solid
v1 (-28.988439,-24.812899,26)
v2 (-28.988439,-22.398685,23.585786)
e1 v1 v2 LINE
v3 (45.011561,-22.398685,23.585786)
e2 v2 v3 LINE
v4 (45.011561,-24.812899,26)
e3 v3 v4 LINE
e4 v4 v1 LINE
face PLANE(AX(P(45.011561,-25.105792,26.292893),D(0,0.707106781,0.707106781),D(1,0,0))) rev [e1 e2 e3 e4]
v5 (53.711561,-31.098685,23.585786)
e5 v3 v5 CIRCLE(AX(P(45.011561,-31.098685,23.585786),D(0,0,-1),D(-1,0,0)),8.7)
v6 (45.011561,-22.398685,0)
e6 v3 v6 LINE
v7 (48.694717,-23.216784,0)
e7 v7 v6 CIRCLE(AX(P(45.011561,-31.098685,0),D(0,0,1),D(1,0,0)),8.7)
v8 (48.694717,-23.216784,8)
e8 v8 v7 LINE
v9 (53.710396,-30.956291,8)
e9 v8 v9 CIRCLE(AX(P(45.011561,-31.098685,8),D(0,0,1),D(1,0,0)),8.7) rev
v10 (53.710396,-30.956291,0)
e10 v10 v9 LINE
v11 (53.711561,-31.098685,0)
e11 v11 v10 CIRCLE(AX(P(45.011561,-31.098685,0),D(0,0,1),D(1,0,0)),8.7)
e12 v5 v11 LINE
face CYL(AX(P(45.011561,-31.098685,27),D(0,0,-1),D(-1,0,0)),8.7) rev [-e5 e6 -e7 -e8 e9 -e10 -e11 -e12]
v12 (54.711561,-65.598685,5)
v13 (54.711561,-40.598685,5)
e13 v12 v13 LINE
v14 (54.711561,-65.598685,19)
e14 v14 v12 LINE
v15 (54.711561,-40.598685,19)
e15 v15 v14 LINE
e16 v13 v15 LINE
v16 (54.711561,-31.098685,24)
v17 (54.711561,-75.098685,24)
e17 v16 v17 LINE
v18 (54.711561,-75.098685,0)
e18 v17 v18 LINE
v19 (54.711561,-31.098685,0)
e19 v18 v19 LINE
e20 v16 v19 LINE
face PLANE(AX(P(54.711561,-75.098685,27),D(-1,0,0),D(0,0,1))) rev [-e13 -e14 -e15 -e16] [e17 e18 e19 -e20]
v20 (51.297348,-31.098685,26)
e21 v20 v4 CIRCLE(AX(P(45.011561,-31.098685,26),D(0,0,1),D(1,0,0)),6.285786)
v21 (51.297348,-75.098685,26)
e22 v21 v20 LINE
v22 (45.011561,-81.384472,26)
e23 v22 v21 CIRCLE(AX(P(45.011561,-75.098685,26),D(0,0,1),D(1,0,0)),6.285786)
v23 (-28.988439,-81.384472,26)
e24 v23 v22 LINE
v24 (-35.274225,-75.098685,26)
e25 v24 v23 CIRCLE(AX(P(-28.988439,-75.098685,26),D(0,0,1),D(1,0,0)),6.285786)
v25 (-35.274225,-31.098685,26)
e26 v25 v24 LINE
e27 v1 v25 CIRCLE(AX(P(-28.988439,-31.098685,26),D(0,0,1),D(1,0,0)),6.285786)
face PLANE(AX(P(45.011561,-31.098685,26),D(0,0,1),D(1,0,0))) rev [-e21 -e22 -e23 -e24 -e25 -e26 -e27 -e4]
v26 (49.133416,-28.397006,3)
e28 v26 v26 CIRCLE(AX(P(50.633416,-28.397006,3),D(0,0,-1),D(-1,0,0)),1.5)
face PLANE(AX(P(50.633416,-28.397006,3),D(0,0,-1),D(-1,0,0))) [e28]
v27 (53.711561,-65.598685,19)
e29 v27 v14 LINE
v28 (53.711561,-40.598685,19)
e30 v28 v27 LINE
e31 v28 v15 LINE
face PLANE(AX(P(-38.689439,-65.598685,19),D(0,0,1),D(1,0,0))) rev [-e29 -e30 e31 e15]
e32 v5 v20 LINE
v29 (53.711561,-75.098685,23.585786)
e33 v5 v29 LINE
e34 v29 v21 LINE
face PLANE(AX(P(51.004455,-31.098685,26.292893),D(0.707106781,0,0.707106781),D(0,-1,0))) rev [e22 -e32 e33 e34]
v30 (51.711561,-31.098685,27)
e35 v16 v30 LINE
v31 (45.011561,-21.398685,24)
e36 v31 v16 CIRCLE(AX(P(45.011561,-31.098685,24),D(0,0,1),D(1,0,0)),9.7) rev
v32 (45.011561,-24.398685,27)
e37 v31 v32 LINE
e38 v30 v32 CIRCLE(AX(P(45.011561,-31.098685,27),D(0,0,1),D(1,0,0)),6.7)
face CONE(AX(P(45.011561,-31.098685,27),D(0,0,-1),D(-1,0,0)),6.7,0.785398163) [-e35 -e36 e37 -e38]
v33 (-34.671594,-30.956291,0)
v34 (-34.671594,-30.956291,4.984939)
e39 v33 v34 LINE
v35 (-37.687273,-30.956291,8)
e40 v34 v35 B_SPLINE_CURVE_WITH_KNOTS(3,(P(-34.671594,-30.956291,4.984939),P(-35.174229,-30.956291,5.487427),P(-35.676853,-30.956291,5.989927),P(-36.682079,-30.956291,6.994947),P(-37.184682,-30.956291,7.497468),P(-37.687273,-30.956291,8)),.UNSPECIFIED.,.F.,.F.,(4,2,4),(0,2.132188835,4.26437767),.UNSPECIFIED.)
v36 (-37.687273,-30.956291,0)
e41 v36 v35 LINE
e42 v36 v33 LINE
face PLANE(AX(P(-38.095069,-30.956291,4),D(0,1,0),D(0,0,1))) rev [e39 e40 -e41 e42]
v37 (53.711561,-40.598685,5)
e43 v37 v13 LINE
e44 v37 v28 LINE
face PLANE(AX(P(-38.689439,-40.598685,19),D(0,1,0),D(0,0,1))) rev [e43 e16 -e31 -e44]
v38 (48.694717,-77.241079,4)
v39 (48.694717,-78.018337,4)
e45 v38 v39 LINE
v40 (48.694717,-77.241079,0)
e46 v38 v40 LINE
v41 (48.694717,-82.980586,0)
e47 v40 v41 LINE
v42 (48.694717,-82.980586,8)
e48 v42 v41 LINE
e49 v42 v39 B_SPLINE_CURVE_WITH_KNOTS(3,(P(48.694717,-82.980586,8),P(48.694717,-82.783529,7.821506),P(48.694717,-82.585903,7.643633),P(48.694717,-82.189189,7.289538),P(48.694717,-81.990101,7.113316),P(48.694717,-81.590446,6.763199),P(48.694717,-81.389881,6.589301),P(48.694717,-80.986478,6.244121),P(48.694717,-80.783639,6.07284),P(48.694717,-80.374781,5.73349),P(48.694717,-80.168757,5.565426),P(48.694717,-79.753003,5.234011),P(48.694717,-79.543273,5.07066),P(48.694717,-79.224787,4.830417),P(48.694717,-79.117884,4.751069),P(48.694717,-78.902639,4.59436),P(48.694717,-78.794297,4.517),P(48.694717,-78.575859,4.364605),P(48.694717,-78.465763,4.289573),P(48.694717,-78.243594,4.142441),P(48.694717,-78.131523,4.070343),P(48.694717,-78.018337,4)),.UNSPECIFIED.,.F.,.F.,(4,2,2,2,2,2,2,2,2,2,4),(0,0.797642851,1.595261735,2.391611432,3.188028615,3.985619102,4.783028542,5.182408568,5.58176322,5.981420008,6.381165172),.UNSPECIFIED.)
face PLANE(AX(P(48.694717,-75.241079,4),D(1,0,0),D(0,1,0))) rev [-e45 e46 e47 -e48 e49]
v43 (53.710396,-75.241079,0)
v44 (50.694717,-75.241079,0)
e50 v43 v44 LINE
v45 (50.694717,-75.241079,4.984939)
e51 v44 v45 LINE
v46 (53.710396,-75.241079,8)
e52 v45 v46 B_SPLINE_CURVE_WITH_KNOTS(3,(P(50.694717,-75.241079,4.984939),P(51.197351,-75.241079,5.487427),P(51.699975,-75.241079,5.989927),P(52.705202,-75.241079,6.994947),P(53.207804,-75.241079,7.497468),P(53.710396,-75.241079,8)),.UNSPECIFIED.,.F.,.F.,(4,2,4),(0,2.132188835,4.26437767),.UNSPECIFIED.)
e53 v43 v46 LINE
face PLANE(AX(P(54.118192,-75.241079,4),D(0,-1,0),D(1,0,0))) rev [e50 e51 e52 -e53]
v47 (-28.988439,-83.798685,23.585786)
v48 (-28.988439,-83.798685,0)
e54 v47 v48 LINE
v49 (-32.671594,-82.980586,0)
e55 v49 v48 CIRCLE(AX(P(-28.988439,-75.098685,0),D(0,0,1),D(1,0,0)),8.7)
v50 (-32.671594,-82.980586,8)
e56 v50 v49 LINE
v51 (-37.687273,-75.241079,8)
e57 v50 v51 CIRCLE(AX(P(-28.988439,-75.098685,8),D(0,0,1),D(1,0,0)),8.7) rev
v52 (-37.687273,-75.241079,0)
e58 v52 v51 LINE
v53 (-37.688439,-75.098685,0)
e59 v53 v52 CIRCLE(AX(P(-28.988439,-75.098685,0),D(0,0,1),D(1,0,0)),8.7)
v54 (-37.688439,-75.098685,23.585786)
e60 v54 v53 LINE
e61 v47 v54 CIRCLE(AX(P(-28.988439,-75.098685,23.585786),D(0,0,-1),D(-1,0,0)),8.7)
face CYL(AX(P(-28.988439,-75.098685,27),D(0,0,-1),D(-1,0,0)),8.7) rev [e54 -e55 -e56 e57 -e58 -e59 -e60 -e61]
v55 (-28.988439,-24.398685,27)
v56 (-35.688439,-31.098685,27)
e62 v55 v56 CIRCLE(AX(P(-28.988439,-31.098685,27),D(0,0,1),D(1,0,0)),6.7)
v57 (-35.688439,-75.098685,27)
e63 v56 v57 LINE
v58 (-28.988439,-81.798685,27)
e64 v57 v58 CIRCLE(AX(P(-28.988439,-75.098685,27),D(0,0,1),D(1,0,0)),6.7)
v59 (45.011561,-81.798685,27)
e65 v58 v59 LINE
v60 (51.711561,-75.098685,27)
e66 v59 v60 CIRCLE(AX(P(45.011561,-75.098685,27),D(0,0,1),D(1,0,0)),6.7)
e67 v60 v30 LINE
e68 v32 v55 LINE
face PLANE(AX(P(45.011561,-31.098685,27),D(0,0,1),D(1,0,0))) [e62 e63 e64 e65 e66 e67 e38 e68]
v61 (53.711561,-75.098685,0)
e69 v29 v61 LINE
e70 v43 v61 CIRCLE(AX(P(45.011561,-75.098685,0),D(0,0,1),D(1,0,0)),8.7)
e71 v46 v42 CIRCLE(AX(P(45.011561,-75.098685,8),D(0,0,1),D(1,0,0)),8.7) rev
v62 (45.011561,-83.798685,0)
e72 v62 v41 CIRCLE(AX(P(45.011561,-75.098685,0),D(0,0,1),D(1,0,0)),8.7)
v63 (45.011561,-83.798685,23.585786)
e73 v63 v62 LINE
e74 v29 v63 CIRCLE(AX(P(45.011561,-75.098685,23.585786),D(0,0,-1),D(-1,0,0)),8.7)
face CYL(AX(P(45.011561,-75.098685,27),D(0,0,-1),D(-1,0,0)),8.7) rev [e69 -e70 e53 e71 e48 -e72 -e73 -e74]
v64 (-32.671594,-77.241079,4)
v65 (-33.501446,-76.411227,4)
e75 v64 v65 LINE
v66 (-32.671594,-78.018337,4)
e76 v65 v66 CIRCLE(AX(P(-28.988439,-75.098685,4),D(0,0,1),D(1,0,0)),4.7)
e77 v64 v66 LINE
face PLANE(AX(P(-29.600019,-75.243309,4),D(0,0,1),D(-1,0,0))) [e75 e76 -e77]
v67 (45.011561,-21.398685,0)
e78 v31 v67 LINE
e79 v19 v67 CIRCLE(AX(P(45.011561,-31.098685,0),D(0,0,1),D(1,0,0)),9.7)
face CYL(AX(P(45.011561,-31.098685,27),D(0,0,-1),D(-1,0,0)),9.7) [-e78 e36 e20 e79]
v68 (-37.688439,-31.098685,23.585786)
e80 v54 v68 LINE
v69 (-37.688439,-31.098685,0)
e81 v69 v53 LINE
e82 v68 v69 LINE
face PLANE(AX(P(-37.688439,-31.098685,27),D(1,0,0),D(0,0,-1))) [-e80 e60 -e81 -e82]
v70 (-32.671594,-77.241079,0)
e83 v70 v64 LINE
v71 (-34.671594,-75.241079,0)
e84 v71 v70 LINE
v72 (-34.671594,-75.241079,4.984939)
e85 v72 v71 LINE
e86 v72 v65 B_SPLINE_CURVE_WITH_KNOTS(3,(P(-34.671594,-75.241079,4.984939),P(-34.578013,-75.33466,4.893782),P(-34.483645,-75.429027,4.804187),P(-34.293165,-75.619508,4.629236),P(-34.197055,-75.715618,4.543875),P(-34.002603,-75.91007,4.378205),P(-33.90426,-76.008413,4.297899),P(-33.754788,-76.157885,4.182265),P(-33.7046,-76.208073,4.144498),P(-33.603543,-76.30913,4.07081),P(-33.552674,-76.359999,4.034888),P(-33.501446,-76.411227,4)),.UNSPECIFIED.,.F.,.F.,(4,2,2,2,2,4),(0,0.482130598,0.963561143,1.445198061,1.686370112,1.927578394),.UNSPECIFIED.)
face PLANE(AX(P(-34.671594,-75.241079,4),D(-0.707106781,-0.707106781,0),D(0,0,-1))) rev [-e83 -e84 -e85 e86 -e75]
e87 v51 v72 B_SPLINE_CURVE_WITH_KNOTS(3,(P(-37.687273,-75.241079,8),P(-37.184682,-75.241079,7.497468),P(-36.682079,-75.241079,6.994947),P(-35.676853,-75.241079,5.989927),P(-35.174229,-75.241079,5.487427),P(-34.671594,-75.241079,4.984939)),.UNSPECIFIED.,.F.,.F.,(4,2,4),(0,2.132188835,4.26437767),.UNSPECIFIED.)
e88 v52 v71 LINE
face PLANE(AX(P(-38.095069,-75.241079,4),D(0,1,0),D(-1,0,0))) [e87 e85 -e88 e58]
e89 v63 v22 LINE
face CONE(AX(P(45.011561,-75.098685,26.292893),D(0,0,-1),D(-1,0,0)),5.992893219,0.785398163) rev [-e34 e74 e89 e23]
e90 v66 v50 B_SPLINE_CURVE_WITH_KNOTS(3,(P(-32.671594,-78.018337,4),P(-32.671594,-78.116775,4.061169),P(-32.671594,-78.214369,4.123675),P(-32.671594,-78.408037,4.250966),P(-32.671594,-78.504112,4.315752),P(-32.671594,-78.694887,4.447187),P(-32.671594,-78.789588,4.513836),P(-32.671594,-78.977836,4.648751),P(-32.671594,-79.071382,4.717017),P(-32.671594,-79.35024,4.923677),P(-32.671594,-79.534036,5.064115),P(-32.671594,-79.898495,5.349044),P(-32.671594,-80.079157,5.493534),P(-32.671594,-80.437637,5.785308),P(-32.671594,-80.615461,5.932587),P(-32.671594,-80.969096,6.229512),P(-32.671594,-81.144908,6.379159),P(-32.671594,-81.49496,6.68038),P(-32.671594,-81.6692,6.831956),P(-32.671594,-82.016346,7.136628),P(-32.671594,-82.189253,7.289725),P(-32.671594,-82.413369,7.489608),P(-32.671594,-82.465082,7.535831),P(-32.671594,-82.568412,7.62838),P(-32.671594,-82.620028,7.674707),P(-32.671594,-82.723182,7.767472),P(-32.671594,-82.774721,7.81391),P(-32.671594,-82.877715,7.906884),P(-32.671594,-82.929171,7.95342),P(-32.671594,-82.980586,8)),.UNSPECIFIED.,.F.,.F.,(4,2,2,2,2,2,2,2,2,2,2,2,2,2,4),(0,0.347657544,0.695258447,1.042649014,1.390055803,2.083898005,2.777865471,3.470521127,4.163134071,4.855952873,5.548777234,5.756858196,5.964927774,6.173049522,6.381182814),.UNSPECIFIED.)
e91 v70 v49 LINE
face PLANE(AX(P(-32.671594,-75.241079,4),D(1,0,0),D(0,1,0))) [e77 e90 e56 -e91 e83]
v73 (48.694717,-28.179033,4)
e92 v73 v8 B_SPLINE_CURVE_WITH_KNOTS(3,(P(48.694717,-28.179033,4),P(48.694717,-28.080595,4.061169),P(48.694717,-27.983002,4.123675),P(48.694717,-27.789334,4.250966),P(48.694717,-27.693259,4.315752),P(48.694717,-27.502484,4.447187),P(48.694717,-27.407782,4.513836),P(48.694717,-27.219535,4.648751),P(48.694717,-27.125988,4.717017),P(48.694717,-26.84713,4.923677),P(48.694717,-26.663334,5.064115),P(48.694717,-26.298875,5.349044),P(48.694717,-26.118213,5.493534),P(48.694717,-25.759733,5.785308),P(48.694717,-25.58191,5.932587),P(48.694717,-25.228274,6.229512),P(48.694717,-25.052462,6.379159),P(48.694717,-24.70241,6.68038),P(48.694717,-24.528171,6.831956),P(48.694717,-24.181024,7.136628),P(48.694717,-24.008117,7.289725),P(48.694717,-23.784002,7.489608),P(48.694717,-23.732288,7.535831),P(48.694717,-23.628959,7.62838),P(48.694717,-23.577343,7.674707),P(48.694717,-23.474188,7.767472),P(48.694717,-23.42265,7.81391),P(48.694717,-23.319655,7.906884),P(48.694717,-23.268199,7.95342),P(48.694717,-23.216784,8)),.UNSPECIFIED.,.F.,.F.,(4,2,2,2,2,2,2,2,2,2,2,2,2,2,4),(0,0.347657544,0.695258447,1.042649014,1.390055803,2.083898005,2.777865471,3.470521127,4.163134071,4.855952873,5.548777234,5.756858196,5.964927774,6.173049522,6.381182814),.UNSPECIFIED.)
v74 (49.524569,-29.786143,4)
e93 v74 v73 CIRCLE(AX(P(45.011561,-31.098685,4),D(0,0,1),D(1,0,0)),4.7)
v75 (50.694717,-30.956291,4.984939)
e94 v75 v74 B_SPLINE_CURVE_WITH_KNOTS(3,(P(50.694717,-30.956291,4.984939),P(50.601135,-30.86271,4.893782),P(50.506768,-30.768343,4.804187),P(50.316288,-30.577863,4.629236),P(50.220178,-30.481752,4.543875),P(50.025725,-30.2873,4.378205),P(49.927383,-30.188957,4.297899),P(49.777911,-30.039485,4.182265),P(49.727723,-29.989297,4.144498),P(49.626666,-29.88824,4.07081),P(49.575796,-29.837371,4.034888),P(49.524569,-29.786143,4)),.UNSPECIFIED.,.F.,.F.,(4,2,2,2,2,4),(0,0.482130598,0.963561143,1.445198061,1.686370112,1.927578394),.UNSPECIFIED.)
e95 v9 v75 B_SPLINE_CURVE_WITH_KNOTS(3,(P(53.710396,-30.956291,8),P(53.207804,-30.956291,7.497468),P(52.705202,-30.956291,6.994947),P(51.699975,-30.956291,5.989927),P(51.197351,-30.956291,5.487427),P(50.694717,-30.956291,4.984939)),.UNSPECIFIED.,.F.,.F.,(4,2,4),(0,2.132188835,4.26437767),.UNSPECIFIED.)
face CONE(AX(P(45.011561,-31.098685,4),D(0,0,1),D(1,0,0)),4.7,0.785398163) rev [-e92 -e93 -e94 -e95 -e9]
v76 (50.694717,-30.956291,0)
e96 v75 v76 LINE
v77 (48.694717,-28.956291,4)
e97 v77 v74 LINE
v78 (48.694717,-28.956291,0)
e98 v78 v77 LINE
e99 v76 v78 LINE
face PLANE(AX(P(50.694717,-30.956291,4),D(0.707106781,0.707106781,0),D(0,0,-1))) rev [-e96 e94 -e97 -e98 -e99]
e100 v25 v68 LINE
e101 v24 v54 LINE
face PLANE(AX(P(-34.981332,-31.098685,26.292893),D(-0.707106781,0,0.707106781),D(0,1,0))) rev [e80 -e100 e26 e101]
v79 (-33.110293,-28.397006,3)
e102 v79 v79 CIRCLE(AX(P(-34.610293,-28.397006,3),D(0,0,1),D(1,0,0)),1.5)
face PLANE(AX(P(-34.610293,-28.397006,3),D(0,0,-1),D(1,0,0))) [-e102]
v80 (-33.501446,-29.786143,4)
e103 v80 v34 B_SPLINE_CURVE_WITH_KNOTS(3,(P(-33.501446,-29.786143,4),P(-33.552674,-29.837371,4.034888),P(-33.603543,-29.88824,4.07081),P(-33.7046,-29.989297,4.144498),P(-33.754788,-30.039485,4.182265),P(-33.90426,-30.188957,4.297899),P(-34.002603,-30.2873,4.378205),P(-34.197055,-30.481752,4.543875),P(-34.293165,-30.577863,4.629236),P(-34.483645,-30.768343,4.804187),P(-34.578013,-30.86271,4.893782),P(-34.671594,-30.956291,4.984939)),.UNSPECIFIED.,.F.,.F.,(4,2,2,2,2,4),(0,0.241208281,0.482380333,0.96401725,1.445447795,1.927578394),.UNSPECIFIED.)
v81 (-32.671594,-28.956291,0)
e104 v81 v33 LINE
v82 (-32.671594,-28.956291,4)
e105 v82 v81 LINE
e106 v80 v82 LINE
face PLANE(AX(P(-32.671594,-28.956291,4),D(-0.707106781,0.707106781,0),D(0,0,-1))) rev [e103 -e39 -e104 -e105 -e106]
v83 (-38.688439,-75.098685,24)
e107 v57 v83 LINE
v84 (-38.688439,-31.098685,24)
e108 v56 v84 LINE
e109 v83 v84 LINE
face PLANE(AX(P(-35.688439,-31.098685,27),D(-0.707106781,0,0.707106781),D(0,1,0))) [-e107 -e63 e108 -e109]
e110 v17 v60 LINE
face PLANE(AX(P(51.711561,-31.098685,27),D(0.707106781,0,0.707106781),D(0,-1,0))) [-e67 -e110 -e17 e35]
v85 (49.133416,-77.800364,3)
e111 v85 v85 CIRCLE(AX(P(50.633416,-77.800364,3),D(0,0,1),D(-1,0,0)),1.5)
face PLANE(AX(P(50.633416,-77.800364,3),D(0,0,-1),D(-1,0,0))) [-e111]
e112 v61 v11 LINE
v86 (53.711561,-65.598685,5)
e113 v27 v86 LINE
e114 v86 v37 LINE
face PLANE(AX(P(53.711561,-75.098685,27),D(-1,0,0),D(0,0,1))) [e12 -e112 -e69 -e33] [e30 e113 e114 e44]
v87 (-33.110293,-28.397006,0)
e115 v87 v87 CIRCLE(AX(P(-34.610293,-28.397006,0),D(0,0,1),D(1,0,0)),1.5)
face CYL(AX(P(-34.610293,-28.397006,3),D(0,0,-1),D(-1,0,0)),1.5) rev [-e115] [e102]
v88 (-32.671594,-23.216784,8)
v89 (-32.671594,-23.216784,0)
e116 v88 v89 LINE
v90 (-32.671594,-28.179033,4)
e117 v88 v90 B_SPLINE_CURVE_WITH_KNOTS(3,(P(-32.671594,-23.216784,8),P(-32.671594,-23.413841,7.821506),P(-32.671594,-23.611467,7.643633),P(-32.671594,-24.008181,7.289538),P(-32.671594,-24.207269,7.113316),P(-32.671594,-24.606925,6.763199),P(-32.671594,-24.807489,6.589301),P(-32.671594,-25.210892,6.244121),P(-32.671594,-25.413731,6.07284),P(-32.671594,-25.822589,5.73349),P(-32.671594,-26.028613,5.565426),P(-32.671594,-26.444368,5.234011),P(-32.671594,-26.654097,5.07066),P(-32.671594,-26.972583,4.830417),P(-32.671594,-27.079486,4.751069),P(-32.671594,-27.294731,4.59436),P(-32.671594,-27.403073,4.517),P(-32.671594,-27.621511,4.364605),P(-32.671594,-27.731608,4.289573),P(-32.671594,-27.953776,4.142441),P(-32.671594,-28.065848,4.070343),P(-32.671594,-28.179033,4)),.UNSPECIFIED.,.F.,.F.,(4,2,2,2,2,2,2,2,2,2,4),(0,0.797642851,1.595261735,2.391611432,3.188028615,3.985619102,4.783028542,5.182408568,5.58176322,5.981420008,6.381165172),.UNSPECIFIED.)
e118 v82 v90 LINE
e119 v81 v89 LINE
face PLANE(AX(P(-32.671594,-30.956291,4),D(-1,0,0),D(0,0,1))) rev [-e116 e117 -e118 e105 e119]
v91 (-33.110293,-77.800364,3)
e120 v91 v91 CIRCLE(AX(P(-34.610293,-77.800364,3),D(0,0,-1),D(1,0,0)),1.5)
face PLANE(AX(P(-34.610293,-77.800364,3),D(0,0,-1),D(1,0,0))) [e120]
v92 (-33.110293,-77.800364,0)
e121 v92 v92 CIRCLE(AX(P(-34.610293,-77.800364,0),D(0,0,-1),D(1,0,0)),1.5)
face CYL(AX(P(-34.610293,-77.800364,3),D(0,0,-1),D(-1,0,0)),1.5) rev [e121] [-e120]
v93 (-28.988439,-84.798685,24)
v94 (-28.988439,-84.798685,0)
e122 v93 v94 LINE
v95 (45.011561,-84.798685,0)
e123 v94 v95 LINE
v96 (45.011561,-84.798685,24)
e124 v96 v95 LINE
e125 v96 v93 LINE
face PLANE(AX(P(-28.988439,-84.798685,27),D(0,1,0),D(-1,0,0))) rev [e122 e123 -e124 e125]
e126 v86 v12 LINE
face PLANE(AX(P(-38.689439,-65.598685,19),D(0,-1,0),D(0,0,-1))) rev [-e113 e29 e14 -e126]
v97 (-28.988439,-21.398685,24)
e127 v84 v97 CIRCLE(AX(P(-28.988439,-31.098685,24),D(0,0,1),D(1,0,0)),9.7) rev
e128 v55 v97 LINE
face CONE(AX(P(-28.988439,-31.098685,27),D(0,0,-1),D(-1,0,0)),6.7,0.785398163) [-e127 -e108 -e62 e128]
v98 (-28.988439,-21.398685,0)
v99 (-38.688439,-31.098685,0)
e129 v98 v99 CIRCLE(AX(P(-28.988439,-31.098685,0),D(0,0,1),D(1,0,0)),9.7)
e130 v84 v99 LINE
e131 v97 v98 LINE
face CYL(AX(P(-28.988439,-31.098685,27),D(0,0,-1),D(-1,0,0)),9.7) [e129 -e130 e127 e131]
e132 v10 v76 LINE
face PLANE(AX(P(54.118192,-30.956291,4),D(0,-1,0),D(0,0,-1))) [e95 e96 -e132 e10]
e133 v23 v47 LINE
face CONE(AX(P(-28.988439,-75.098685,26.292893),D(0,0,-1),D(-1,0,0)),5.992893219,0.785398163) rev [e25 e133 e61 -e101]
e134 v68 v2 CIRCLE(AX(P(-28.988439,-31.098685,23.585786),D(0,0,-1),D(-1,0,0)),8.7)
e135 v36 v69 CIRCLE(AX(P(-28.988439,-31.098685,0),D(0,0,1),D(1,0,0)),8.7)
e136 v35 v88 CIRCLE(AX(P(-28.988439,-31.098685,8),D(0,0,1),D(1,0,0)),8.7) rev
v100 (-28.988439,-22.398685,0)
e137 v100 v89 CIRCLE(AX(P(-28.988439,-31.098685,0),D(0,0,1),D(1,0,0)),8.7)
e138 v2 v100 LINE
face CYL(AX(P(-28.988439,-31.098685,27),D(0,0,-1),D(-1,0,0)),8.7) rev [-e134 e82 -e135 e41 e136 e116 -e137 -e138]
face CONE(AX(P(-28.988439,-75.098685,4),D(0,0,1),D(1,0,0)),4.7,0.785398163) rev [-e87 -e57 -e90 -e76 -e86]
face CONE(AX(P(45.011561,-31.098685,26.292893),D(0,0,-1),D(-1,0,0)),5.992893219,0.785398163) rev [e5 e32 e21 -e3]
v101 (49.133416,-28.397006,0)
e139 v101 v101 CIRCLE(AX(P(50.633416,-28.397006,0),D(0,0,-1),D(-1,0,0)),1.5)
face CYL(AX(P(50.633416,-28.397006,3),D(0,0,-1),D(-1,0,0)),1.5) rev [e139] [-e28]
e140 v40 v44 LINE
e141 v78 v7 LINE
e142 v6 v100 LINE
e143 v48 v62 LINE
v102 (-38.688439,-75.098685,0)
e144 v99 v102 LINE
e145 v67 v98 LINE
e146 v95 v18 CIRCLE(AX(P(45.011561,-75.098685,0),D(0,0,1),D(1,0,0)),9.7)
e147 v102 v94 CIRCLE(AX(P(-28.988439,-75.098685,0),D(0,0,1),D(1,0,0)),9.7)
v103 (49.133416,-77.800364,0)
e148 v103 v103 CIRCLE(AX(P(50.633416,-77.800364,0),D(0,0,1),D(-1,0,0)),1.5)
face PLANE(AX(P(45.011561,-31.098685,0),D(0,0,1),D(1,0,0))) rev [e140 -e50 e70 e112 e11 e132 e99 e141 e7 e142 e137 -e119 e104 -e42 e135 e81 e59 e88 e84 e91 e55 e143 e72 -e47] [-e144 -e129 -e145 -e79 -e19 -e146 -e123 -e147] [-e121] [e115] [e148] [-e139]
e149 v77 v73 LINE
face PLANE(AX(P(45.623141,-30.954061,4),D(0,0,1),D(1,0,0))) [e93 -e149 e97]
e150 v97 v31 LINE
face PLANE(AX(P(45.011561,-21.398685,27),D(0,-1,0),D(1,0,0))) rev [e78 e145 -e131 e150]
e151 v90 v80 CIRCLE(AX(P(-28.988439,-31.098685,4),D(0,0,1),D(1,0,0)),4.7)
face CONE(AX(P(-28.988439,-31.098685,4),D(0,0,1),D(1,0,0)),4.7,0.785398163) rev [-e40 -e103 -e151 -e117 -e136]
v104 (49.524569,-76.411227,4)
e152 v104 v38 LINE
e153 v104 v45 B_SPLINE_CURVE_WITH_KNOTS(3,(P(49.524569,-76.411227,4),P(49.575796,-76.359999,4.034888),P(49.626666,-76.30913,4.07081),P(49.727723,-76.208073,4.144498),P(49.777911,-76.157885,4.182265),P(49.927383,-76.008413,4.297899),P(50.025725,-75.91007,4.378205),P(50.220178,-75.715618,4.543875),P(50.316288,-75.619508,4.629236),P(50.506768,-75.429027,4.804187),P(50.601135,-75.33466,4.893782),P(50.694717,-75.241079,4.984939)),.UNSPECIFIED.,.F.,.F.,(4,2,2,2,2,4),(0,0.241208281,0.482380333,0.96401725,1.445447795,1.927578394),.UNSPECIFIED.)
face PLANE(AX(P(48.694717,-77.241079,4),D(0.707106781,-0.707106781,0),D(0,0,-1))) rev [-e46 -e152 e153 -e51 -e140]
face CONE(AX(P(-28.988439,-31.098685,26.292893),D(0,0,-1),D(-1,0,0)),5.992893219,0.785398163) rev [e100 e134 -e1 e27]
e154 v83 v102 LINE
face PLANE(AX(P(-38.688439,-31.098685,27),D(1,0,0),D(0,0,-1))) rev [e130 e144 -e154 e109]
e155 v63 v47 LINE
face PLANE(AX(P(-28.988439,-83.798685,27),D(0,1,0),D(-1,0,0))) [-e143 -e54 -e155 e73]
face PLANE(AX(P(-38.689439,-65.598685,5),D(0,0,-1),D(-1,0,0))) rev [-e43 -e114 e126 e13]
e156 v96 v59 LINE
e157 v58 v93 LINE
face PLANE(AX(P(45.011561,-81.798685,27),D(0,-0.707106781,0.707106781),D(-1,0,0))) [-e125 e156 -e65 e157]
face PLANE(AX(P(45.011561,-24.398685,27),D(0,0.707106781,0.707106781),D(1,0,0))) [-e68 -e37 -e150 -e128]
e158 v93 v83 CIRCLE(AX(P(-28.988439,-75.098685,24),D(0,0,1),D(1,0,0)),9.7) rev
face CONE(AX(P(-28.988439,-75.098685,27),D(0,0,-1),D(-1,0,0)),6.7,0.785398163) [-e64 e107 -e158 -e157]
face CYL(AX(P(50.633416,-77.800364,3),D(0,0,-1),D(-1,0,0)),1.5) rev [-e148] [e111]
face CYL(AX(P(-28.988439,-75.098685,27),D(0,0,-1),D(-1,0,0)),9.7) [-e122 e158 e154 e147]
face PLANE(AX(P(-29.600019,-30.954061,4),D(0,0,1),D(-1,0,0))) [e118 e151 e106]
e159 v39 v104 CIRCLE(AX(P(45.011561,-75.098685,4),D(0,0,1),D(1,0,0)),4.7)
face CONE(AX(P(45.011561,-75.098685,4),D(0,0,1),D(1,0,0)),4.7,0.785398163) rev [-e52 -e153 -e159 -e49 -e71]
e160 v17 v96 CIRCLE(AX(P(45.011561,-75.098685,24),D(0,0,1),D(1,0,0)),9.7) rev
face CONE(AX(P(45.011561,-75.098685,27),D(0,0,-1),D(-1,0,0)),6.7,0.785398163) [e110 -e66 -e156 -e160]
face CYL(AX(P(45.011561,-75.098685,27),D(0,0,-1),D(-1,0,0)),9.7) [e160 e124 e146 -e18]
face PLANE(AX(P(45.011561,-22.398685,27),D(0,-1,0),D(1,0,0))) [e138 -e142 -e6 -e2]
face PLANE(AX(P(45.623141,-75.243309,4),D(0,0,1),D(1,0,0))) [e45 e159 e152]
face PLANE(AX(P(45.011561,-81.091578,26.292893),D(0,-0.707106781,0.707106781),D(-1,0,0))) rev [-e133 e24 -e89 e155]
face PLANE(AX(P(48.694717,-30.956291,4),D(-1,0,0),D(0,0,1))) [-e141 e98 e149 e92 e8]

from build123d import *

# Parameters (mm, degrees)
BOSS_EXTRUDE1_DEPTH     = 27
CHAMFER1_SIZE           = 3
SHELL1_T                = -1
CUT_EXTRUDE1_REACH      = 131.009
SKETCH2_W               = 14
SKETCH2_H               = 25
BOSS_EXTRUDE2_DEPTH     = 4
SKETCH7_R               = 1.5
CUT_EXTRUDE2_DEPTH      = 3
MIRROR2_COPY_1_DEPTH    = 4
MIRROR2_COPY_2_SKETCH_R = 1.5
MIRROR2_COPY_2_DEPTH    = 3
CHAMFER2_SIZE           = 2
CHAMFER3_SIZE           = 4


with BuildPart() as part:
    # Sketch1 → Boss-Extrude1 (new body)
    with BuildSketch(Plane.XY):
        with BuildLine():
            Line((54.711561383, -75.098685124), (54.711561383, -31.098685124))
            ThreePointArc((54.711561383, -31.098685124), (51.87049716, -24.239749346), (45.011561383, -21.398685124))
            Line((45.011561383, -21.398685124), (-28.988438617, -21.398685124))
            ThreePointArc((-28.988438617, -21.398685124), (-35.847374395, -24.239749346), (-38.688438617, -31.098685124))
            Line((-38.688438617, -31.098685124), (-38.688438617, -75.098685124))
            ThreePointArc((-38.688438617, -75.098685124), (-35.847374395, -81.957620901), (-28.988438617, -84.798685124))
            Line((-28.988438617, -84.798685124), (45.011561383, -84.798685124))
            ThreePointArc((45.011561383, -84.798685124), (51.87049716, -81.957620901), (54.711561383, -75.098685124))
        make_face()
    extrude(amount=BOSS_EXTRUDE1_DEPTH)

    # Chamfer1
    chamfer1_edges = [part.edges().sort_by_distance(p)[0] for p in [
        (-35.847374395, -24.239749346, 27),
        (-38.688438617, -53.098685124, 27),
        (-35.847374395, -81.957620901, 27),
        (8.011561383, -84.798685124, 27),
        (51.87049716, -81.957620901, 27),
        (54.711561383, -53.098685124, 27),
        (51.87049716, -24.239749346, 27),
        (8.011561383, -21.398685124, 27),
    ]]
    chamfer(chamfer1_edges, length=CHAMFER1_SIZE)

    # Shell1
    shell1_openings = [part.faces().sort_by_distance(p)[0] for p in [
        (8.011561383, -53.098685124, 0),
    ]]
    offset(amount=SHELL1_T, openings=shell1_openings, kind=Kind.INTERSECTION)

    # Sketch2 → Cut-Extrude1 (cut, up to next)
    with BuildSketch(Plane(origin=(54.711561383, 0, 0), x_dir=(0, 0, -1), z_dir=(1, 0, 0)), mode=Mode.PRIVATE) as cut_extrude1_sk1:
        with Locations((-12, -53.098685124)):
            Rectangle(SKETCH2_W, SKETCH2_H)
    cut_extrude1_tool1 = extrude(cut_extrude1_sk1.sketch, amount=-CUT_EXTRUDE1_REACH, mode=Mode.PRIVATE) & part.part
    add(cut_extrude1_tool1.solids().sort_by_distance((54.711561, -53.098685, 12))[0], mode=Mode.SUBTRACT)

    # Sketch3 → Boss-Extrude2 (add)
    with BuildSketch(Plane(origin=(0, 0, 0), x_dir=(-1, 0, 0), z_dir=(0, 0, -1))):
        with BuildLine():
            Line((-54.118192185, -30.956291213), (-48.694716552, -30.956291213))
            Line((-48.694716552, -30.956291213), (-48.694716552, -23.033750656))
            ThreePointArc((-48.694716552, -23.033750656), (-52.633018075, -26.155361191), (-54.118192185, -30.956291213))
        make_face()
    boss_extrude2 = extrude(amount=-BOSS_EXTRUDE2_DEPTH)

    # Sketch7 → Cut-Extrude2 (cut)
    with BuildSketch(Plane(origin=(0, 0, 0), x_dir=(-1, 0, 0), z_dir=(0, 0, -1))):
        with Locations((-50.633416054, -28.397006104)):
            Circle(SKETCH7_R)
    cut_extrude2 = extrude(amount=-CUT_EXTRUDE2_DEPTH, mode=Mode.SUBTRACT)

    # Mirror1: Boss-Extrude2, Cut-Extrude2 across plane
    add(boss_extrude2.mirror(Plane(origin=(0, -53.098685124, 0), x_dir=(0, 0, 1), z_dir=(0, -1, 0))))
    add(cut_extrude2.mirror(Plane(origin=(0, -53.098685124, 0), x_dir=(0, 0, 1), z_dir=(0, -1, 0))), mode=Mode.SUBTRACT)

    # Mirror2: Boss-Extrude2, Cut-Extrude2 across plane
    add(boss_extrude2.mirror(Plane.ZY.offset(-8.011561383)))
    add(cut_extrude2.mirror(Plane.ZY.offset(-8.011561383)), mode=Mode.SUBTRACT)

    # Mirror2 copy 1 sketch → Mirror2 copy 1 (add)
    with BuildSketch(Plane(origin=(16.023122766, -106.197370247, 0), x_dir=(1, 0, 0), z_dir=(0, 0, -1))):
        with BuildLine():
            Line((-54.118192185, -30.956291213), (-48.694716552, -30.956291213))
            Line((-48.694716552, -30.956291213), (-48.694716552, -23.033750656))
            ThreePointArc((-48.694716552, -23.033750656), (-52.633018075, -26.155361191), (-54.118192185, -30.956291213))
        make_face()
    extrude(amount=-MIRROR2_COPY_1_DEPTH)

    # Mirror2 copy 2 sketch → Mirror2 copy 2 (cut)
    with BuildSketch(Plane(origin=(16.023122766, -106.197370247, 0), x_dir=(1, 0, 0), z_dir=(0, 0, -1))):
        with Locations((-50.633416054, -28.397006104)):
            Circle(MIRROR2_COPY_2_SKETCH_R)
    extrude(amount=-MIRROR2_COPY_2_DEPTH, mode=Mode.SUBTRACT)

    # Chamfer2
    chamfer2_edges = [part.edges().sort_by_distance(p)[0] for p in [
        (48.694716552, -30.956291213, 2),
        (48.694716552, -75.241079034, 2),
        (-32.671593786, -75.241079034, 2),
        (-32.671593786, -30.956291213, 2),
    ]]
    chamfer(chamfer2_edges, length=CHAMFER2_SIZE)

    # Chamfer3
    # the kernel refuses this chamfer: 4 mm, written as the material it adds along each edge
    with BuildSketch(Plane(origin=(-28.988438617, -31.098685124, 4), x_dir=(-0.39359677864958253, -0.9192831858772744, 0), z_dir=(0.9192831858772744, -0.39359677864958253, 0))) as chamfer3_piece_1_section:
        Polygon((8.7, -CHAMFER3_SIZE), (8.7 - CHAMFER3_SIZE, 0), (8.7, 0), align=None)
    chamfer3_piece_1 = revolve(axis=Axis((-28.988438617, -31.098685124, 4), (0, 0, -1)), revolution_arc=199.53449135, mode=Mode.PRIVATE)
    chamfer3_piece_1 = split(chamfer3_piece_1, bisect_by=Plane(origin=(-32.671593786, -27.350508509, 5.442527719), z_dir=(-1, 0, 0)), keep=Keep.TOP, mode=Mode.PRIVATE)
    chamfer3_piece_1 = split(chamfer3_piece_1, bisect_by=Plane(origin=(-35.212045354, -30.956291213, 5.442527719), z_dir=(0, 1, 0)), keep=Keep.TOP, mode=Mode.PRIVATE)
    chamfer3_piece_1 = split(chamfer3_piece_1, bisect_by=Plane(origin=(-33.138928218, -29.423625644, 5.442527719), z_dir=(-0.7071067811865476, 0.7071067811865476, 0)), keep=Keep.TOP, mode=Mode.PRIVATE)
    add(chamfer3_piece_1)
    with BuildSketch(Plane(origin=(-28.988438617, -75.098685124, 4), x_dir=(0.6783261272249539, -0.7347609578114475, 0), z_dir=(0.7347609578114475, 0.6783261272249539, 0))) as chamfer3_piece_2_section:
        Polygon((8.7, -CHAMFER3_SIZE), (8.7 - CHAMFER3_SIZE, 0), (8.7, 0), align=None)
    chamfer3_piece_2 = revolve(axis=Axis((-28.988438617, -75.098685124, 4), (0, 0, -1)), revolution_arc=199.53449135, mode=Mode.PRIVATE)
    chamfer3_piece_2 = split(chamfer3_piece_2, bisect_by=Plane(origin=(-35.212045354, -75.241079034, 5.44252772), z_dir=(0, -1, 0)), keep=Keep.TOP, mode=Mode.PRIVATE)
    chamfer3_piece_2 = split(chamfer3_piece_2, bisect_by=Plane(origin=(-32.671593786, -78.846861739, 5.44252772), z_dir=(-1, 0, 0)), keep=Keep.TOP, mode=Mode.PRIVATE)
    chamfer3_piece_2 = split(chamfer3_piece_2, bisect_by=Plane(origin=(-33.138928218, -76.773744603, 5.44252772), z_dir=(-0.7071067811865476, -0.7071067811865476, 0)), keep=Keep.TOP, mode=Mode.PRIVATE)
    add(chamfer3_piece_2)
    with BuildSketch(Plane(origin=(45.011561383, -75.098685124, 4), x_dir=(0.39359677864958265, 0.9192831858772744, 0), z_dir=(-0.9192831858772744, 0.39359677864958265, 0))) as chamfer3_piece_3_section:
        Polygon((8.7, -CHAMFER3_SIZE), (8.7 - CHAMFER3_SIZE, 0), (8.7, 0), align=None)
    chamfer3_piece_3 = revolve(axis=Axis((45.011561383, -75.098685124, 4), (0, 0, -1)), revolution_arc=199.53449135, mode=Mode.PRIVATE)
    chamfer3_piece_3 = split(chamfer3_piece_3, bisect_by=Plane(origin=(48.694716552, -78.846861739, 5.44252772), z_dir=(1, 0, 0)), keep=Keep.TOP, mode=Mode.PRIVATE)
    chamfer3_piece_3 = split(chamfer3_piece_3, bisect_by=Plane(origin=(51.23516812, -75.241079034, 5.44252772), z_dir=(0, -1, 0)), keep=Keep.TOP, mode=Mode.PRIVATE)
    chamfer3_piece_3 = split(chamfer3_piece_3, bisect_by=Plane(origin=(49.162050984, -76.773744603, 5.44252772), z_dir=(0.7071067811865476, -0.7071067811865476, 0)), keep=Keep.TOP, mode=Mode.PRIVATE)
    add(chamfer3_piece_3)
    with BuildSketch(Plane(origin=(45.011561383, -31.098685124, 4), x_dir=(-0.6783261272249526, 0.7347609578114488, 0), z_dir=(-0.7347609578114488, -0.6783261272249526, 0))) as chamfer3_piece_4_section:
        Polygon((8.7, -CHAMFER3_SIZE), (8.7 - CHAMFER3_SIZE, 0), (8.7, 0), align=None)
    chamfer3_piece_4 = revolve(axis=Axis((45.011561383, -31.098685124, 4), (0, 0, -1)), revolution_arc=199.53449135, mode=Mode.PRIVATE)
    chamfer3_piece_4 = split(chamfer3_piece_4, bisect_by=Plane(origin=(51.23516812, -30.956291213, 5.44252772), z_dir=(0, 1, 0)), keep=Keep.TOP, mode=Mode.PRIVATE)
    chamfer3_piece_4 = split(chamfer3_piece_4, bisect_by=Plane(origin=(49.162050984, -29.423625644, 5.44252772), z_dir=(0.7071067811865476, 0.7071067811865476, 0)), keep=Keep.TOP, mode=Mode.PRIVATE)
    chamfer3_piece_4 = split(chamfer3_piece_4, bisect_by=Plane(origin=(48.694716552, -27.350508508, 5.44252772), z_dir=(1, 0, 0)), keep=Keep.TOP, mode=Mode.PRIVATE)
    add(chamfer3_piece_4)


solid = part.part
